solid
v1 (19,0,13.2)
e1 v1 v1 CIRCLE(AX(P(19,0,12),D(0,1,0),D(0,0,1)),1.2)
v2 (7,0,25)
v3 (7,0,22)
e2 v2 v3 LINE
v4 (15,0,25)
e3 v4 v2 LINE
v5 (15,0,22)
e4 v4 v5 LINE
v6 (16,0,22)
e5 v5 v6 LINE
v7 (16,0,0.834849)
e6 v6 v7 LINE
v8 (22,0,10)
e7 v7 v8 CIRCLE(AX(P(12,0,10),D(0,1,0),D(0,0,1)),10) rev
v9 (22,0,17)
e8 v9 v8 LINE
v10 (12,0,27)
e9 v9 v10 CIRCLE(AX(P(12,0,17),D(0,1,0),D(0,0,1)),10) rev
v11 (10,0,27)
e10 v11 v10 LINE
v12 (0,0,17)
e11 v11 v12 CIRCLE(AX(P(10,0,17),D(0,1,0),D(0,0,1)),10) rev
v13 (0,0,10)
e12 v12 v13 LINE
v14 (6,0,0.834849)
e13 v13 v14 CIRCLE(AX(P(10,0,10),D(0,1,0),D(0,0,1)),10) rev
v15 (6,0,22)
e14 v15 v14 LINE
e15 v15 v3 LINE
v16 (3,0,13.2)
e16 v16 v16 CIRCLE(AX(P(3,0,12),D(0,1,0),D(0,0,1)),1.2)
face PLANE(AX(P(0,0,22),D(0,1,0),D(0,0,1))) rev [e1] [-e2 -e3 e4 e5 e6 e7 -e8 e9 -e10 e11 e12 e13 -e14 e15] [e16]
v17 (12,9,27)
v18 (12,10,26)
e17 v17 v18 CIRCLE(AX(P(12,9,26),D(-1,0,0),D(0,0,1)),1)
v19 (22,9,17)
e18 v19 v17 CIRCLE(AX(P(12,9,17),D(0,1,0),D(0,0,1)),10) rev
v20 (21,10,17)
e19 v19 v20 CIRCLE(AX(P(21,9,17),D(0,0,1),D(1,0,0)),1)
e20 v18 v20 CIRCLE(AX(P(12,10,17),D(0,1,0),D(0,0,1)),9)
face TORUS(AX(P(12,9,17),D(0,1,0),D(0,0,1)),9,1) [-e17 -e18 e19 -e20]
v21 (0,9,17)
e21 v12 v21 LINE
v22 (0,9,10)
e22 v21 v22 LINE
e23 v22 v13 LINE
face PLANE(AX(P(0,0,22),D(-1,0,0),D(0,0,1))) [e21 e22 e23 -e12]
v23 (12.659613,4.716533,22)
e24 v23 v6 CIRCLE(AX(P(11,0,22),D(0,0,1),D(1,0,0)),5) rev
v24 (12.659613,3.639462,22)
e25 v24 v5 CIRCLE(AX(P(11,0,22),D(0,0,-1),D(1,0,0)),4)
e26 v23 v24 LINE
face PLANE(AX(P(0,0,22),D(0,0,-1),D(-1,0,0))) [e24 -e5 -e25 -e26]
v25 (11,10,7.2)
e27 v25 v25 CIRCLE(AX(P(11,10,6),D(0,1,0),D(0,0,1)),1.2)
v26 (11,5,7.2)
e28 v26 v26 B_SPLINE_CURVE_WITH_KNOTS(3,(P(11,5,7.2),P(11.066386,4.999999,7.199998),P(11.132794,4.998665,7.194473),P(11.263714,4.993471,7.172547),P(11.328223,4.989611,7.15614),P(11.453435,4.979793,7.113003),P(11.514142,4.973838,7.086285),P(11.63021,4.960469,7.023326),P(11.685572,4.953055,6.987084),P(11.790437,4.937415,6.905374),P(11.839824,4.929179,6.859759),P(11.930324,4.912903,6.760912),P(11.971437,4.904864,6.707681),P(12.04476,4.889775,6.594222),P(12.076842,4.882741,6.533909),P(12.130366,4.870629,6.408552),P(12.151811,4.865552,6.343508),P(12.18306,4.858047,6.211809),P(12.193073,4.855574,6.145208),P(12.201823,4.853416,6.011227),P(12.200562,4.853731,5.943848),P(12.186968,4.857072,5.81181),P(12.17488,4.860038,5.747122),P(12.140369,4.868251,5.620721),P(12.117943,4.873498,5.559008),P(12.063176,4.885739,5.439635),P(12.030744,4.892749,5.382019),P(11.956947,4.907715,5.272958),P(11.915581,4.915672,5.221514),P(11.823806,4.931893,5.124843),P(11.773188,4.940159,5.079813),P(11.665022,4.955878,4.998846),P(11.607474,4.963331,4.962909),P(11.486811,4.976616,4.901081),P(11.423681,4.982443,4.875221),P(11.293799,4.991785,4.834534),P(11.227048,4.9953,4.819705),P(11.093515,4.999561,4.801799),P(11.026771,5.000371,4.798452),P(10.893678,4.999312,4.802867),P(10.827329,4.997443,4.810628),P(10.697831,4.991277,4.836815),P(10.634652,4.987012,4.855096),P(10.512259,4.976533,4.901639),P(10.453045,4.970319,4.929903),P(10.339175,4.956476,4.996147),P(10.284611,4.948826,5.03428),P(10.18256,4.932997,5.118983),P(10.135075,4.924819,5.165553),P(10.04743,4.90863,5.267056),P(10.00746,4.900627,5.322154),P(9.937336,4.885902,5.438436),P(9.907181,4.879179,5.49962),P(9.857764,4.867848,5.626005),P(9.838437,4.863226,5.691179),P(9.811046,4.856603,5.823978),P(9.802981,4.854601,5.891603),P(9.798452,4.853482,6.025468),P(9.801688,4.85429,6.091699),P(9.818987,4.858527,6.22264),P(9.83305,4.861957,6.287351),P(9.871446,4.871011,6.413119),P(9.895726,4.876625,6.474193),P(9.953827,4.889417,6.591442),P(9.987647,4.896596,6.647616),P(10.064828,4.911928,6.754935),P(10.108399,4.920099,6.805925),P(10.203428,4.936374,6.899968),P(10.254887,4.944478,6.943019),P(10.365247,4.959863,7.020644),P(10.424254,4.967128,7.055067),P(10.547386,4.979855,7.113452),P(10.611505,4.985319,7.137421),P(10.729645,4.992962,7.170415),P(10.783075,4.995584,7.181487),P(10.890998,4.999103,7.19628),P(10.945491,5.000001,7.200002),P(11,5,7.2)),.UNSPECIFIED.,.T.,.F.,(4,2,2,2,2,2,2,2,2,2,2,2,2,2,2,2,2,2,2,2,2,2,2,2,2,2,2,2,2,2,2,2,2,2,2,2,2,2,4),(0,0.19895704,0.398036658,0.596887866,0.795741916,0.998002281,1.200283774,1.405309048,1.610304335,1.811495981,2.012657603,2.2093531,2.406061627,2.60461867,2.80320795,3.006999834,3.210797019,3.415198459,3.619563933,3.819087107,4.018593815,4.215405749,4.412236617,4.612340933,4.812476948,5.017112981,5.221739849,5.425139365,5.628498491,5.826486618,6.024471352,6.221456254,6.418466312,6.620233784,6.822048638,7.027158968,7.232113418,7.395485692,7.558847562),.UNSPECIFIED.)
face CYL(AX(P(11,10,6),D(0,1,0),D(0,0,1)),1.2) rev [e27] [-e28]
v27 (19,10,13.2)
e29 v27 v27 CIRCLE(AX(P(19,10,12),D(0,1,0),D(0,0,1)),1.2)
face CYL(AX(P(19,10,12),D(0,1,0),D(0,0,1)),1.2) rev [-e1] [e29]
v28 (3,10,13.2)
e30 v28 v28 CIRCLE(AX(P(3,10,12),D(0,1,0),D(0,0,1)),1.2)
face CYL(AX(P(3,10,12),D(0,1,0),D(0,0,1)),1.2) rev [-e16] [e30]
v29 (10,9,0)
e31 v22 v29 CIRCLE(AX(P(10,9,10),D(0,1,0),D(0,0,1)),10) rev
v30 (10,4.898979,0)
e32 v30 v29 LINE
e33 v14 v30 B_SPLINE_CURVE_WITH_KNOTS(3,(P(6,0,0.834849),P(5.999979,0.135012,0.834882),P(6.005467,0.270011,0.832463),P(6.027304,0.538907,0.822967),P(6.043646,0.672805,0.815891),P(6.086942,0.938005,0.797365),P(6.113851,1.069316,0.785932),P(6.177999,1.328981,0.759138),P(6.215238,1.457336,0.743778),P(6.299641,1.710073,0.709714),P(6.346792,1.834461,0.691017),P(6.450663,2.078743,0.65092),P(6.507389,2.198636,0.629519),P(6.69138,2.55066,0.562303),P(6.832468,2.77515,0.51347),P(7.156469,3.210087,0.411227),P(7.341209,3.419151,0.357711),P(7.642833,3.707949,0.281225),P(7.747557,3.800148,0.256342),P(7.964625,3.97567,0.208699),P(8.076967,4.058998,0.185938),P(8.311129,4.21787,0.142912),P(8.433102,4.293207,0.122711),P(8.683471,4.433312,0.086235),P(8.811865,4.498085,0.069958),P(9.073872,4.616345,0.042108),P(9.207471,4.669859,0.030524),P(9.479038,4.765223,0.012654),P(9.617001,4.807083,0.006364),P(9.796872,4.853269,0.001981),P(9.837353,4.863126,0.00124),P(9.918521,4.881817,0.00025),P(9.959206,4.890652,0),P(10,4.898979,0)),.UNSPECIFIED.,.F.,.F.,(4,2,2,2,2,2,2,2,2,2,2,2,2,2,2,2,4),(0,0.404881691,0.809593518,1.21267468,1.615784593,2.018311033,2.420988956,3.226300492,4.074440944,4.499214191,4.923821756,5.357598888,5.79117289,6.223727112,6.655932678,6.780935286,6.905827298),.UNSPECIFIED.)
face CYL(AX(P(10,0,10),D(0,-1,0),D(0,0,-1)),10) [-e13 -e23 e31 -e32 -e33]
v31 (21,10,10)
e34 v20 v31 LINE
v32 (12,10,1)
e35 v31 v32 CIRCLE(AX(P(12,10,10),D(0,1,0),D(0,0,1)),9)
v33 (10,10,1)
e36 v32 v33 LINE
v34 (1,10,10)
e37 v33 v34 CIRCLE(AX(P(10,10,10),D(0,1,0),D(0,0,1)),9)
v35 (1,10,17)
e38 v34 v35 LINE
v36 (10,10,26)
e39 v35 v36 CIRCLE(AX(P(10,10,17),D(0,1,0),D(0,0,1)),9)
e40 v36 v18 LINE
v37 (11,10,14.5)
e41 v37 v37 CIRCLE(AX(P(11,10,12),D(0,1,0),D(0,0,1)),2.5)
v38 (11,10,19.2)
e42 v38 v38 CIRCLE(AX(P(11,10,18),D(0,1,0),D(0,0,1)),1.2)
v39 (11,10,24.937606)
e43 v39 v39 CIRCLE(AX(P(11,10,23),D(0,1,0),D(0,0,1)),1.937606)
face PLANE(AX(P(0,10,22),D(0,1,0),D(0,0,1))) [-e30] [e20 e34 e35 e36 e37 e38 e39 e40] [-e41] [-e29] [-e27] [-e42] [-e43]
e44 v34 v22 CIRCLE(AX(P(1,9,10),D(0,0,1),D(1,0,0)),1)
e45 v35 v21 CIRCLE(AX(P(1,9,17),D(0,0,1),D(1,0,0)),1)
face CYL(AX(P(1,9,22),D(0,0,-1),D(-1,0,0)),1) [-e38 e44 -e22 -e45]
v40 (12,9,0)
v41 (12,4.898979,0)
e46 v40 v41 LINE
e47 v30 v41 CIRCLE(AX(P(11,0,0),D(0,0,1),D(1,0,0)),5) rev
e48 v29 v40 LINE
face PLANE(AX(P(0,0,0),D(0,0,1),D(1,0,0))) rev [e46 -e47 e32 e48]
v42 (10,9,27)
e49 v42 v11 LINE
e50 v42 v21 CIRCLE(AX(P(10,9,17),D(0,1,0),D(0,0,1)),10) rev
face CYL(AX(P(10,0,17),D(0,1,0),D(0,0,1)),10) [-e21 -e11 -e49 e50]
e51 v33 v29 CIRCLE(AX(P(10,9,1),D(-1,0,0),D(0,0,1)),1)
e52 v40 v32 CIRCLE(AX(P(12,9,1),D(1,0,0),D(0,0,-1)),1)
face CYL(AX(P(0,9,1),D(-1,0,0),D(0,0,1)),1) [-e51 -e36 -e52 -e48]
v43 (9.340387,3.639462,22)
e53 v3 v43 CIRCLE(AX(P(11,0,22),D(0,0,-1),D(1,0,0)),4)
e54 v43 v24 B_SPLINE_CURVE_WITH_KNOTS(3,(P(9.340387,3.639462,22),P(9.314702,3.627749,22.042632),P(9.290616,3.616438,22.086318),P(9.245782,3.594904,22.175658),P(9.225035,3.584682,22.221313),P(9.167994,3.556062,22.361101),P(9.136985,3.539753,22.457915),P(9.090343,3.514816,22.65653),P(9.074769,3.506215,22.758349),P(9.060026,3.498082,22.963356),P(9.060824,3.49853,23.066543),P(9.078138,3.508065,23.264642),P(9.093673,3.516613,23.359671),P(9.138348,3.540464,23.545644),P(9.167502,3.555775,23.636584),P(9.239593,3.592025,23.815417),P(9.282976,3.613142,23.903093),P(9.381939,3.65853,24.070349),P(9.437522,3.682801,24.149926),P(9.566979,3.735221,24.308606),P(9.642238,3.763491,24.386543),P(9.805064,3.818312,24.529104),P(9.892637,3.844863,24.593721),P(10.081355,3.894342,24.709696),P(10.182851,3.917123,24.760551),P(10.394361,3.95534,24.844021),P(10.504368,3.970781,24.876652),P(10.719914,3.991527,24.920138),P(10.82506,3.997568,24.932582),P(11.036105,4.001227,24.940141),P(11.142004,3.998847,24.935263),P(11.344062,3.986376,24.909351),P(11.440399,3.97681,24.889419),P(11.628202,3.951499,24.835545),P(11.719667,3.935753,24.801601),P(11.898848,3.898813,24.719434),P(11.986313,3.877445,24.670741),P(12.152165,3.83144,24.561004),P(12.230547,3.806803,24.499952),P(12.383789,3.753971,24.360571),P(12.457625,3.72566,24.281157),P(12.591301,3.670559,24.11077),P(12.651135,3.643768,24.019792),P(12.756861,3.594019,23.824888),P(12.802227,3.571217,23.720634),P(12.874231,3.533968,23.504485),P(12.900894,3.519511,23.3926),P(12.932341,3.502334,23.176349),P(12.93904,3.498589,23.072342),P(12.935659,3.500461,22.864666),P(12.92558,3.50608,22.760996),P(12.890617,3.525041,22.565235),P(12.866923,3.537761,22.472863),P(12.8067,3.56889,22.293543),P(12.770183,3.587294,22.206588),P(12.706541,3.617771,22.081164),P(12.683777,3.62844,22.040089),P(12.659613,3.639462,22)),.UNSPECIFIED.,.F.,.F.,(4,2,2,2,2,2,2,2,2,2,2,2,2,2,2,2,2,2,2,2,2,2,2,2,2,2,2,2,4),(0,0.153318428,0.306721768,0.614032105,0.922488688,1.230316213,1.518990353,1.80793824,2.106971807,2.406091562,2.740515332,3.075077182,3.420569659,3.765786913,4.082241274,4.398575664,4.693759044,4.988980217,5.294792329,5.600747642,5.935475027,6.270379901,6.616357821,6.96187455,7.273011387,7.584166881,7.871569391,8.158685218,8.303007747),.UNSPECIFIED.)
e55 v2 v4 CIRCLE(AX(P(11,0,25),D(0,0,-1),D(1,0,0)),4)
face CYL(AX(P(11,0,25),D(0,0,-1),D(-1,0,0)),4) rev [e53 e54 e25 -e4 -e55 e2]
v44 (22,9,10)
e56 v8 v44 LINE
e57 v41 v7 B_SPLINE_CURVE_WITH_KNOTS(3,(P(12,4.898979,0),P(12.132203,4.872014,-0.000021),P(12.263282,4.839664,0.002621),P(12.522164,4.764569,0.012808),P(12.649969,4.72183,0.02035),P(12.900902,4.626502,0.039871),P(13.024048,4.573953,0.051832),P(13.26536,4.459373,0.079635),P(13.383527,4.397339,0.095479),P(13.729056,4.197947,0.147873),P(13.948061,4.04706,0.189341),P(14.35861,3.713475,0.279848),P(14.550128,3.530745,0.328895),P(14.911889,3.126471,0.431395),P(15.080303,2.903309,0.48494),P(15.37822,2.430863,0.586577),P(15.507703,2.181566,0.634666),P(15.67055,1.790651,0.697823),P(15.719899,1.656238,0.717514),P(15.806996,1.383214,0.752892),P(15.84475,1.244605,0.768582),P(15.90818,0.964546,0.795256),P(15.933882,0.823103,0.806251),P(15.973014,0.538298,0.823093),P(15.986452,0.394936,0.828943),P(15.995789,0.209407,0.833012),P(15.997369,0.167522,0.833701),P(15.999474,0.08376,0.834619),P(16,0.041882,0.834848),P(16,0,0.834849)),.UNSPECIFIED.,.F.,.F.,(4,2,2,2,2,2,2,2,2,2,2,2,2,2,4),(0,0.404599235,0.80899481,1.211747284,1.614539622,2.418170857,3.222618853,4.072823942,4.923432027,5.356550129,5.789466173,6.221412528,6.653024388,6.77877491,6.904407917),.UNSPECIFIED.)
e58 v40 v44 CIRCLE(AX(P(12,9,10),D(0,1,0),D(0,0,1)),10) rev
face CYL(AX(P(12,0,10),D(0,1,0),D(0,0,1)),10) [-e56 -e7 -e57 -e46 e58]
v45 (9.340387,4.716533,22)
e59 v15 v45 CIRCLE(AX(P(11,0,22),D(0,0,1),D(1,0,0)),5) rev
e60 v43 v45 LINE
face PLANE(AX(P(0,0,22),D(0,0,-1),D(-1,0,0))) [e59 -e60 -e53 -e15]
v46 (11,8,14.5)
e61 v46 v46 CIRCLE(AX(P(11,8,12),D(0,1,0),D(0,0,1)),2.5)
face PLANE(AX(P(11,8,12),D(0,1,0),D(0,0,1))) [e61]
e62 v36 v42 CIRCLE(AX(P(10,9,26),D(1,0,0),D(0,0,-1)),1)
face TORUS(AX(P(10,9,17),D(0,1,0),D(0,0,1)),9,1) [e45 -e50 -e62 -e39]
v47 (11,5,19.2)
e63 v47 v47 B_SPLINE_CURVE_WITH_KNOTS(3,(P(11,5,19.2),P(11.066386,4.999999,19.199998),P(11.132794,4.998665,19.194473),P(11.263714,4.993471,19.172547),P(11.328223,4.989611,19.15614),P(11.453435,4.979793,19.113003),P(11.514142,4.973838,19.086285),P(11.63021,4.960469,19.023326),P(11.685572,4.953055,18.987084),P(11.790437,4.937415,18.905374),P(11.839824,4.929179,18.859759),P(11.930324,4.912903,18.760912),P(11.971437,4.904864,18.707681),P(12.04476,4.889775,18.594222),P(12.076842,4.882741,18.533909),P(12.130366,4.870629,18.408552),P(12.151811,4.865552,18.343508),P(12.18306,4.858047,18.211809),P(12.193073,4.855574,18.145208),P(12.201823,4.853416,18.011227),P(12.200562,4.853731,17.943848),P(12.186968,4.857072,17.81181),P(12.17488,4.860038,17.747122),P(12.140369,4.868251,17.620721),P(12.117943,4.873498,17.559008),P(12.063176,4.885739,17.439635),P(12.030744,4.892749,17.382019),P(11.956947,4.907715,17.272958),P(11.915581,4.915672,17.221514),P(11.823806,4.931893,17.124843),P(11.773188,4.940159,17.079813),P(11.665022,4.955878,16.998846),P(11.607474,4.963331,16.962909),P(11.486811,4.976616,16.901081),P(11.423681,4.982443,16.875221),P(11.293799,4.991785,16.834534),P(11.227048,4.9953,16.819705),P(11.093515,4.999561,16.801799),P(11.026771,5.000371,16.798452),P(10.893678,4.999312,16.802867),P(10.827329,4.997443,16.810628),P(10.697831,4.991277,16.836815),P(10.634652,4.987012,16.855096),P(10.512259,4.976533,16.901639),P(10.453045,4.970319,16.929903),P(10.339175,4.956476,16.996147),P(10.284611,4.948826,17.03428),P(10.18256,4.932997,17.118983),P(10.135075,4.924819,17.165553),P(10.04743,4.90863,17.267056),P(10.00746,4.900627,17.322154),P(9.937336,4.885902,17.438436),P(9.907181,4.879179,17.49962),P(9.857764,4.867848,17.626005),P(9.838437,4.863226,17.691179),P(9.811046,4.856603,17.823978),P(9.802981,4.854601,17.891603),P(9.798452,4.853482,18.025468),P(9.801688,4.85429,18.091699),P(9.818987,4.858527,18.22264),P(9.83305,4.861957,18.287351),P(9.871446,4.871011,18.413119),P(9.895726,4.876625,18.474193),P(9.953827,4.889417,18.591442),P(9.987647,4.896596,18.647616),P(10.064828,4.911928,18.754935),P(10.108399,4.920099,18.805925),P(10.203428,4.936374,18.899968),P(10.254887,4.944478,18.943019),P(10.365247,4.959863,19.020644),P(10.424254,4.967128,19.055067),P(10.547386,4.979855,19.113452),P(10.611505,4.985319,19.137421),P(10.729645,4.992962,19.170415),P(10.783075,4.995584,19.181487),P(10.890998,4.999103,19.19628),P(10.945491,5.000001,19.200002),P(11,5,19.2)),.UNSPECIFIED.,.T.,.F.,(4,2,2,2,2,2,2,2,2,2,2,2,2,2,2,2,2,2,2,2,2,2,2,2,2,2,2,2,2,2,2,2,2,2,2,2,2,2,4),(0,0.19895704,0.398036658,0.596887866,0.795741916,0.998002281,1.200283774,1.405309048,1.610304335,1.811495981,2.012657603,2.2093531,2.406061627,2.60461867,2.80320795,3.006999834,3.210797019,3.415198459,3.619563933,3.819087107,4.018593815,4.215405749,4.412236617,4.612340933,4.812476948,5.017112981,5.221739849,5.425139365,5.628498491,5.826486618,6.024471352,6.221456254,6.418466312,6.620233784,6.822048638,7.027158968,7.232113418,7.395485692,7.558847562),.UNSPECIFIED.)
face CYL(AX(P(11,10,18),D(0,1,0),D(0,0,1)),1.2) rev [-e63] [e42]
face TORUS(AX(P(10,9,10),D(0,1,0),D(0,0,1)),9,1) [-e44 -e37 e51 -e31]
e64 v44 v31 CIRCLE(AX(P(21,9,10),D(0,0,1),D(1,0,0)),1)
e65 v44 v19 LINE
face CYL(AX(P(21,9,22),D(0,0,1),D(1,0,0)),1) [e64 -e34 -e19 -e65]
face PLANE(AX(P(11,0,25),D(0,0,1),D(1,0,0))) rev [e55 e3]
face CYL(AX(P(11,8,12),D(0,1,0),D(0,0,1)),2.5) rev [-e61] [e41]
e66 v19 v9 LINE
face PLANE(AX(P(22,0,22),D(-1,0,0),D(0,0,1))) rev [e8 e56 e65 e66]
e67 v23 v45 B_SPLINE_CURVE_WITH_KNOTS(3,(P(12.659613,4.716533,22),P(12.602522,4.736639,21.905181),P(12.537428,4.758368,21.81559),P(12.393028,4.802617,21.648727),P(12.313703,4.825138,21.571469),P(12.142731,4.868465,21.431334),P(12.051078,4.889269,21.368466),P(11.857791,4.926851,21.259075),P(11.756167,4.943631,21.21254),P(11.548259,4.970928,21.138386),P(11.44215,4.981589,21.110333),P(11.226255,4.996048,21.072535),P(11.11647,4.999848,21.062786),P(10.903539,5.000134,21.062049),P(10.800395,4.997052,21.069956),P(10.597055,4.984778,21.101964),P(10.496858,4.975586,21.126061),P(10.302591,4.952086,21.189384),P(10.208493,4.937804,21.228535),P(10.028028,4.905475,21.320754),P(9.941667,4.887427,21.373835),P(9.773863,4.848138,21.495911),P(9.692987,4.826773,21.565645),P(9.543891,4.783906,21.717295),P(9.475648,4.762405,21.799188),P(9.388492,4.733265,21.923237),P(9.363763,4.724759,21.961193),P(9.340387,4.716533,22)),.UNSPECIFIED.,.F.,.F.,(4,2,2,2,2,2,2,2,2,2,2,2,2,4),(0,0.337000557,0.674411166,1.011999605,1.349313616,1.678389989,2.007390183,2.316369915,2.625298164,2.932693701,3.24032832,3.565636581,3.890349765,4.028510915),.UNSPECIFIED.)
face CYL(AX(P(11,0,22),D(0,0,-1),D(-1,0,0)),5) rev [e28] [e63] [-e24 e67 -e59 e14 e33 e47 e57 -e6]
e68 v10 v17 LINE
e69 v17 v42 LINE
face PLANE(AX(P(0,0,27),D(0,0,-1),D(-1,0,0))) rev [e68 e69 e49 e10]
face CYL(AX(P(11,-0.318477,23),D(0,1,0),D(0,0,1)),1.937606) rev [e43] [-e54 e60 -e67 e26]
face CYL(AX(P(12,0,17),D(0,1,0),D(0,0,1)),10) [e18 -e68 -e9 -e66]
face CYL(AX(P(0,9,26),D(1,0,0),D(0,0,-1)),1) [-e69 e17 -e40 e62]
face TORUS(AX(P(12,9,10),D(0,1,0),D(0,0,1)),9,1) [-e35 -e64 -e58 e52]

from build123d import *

# Parameters (mm, degrees)
BOSS_EXTRU_1_DEPTH      = 22
D_GAGEMENT_M21_D        = 2.4
ESQUISSE5_W             = 22
ESQUISSE5_H             = 10
BOSS_EXTRU_2_DEPTH      = 5
CONG_1_R                = 10
CONG_3_R                = 1
ENL_V_MAT_EXTRU_2_DEPTH = 3
ESQUISSE12_R            = 1.9376057
ENL_V_MAT_EXTRU_3_DEPTH = 37.235341952
ESQUISSE13_R            = 2.5
ENL_V_MAT_EXTRU_4_DEPTH = 2


with BuildPart() as part:
    # Esquisse1 → Boss.-Extru.1 (new body)
    with BuildSketch(Plane.XY):
        with BuildLine():
            Line((0, 10), (0, 0))
            Line((0, 0), (6, 0))
            ThreePointArc((6, 0), (11, 5), (16, 0))
            Line((16, 0), (22, 0))
            Line((22, 0), (22, 10))
            Line((22, 10), (0, 10))
        make_face()
    extrude(amount=BOSS_EXTRU_1_DEPTH)

    # Dégagement M21 (through all)
    with Locations(Plane(origin=(0, 10, 0), x_dir=(1, 0, 0), z_dir=(0, 1, 0))):
        with Locations((11, -6), (11, -18), (3, -12), (19, -12)):
            Hole(D_GAGEMENT_M21_D / 2)

    # Esquisse5 → Boss.-Extru.2 (add)
    with BuildSketch(Plane.XY.offset(22)):
        with Locations((11, 5)):
            Rectangle(ESQUISSE5_W, ESQUISSE5_H)
    extrude(amount=BOSS_EXTRU_2_DEPTH)

    # Congé1
    # the kernel refuses this fillet: 10 mm, written as the material it takes off along each edge
    with BuildSketch(Plane(origin=(0, 35, 0), x_dir=(0, 0, 1), z_dir=(0, -1, 0))) as cong_1_piece_1:
        with BuildLine():
            CenterArc((CONG_1_R, -CONG_1_R), CONG_1_R, 90, 90)
            Line((0, -CONG_1_R), (0, 0))
            Line((0, 0), (CONG_1_R, 0))
        make_face()
    extrude(amount=60, mode=Mode.SUBTRACT)
    with BuildSketch(Plane(origin=(0, 35, 27), x_dir=(0, 0, -1), z_dir=(0, -1, 0)), Plane(origin=(22, -25, 0), x_dir=(-1, 0, 0), z_dir=(0, 1, 0)), Plane(origin=(22, -25, 27), x_dir=(0, 0, -1), z_dir=(0, 1, 0))) as cong_1_piece_2:
        with BuildLine():
            CenterArc((CONG_1_R, CONG_1_R), CONG_1_R, 180, 90)
            Line((0, CONG_1_R), (0, 0))
            Line((0, 0), (CONG_1_R, 0))
        make_face()
    extrude(amount=60, mode=Mode.SUBTRACT)

    # Congé3
    cong_3_edges = [part.edges().sort_by_distance(p)[0] for p in [
        (11, 10, 0),
        (0, 10, 13.5),
        (11, 10, 27),
        (22, 10, 13.5),
        (19.071067812, 10, 24.071067812),
        (19.071067812, 10, 2.928932188),
        (2.928932188, 10, 24.071067812),
        (2.928932188, 10, 2.928932188),
    ]]
    fillet(cong_3_edges, radius=CONG_3_R)

    # Esquisse10 → Enlèv. mat.-Extru.2 (cut)
    with BuildSketch(Plane(origin=(0, 0, 22), x_dir=(-1, 0, 0), z_dir=(0, 0, -1))):
        with BuildLine():
            Line((-7, 0), (-15, 0))
            ThreePointArc((-15, 0), (-11, 4), (-7, 0))
        make_face()
    extrude(amount=-ENL_V_MAT_EXTRU_2_DEPTH, mode=Mode.SUBTRACT)

    # Esquisse12 → Enlèv. mat.-Extru.3 (cut, through all)
    with BuildSketch(Plane(origin=(0, 10, 0), x_dir=(1, 0, 0), z_dir=(0, 1, 0))):
        with Locations(Location((11, -23, 0), (0, 0, 270))):
            Circle(ESQUISSE12_R)
    extrude(amount=-ENL_V_MAT_EXTRU_3_DEPTH, mode=Mode.SUBTRACT)

    # Esquisse13 → Enlèv. mat.-Extru.4 (cut)
    with BuildSketch(Plane(origin=(0, 10, 0), x_dir=(1, 0, 0), z_dir=(0, 1, 0))):
        with Locations(Location((11, -12, 0), (0, 0, 270))):
            Circle(ESQUISSE13_R)
    extrude(amount=-ENL_V_MAT_EXTRU_4_DEPTH, mode=Mode.SUBTRACT)


solid = part.part
